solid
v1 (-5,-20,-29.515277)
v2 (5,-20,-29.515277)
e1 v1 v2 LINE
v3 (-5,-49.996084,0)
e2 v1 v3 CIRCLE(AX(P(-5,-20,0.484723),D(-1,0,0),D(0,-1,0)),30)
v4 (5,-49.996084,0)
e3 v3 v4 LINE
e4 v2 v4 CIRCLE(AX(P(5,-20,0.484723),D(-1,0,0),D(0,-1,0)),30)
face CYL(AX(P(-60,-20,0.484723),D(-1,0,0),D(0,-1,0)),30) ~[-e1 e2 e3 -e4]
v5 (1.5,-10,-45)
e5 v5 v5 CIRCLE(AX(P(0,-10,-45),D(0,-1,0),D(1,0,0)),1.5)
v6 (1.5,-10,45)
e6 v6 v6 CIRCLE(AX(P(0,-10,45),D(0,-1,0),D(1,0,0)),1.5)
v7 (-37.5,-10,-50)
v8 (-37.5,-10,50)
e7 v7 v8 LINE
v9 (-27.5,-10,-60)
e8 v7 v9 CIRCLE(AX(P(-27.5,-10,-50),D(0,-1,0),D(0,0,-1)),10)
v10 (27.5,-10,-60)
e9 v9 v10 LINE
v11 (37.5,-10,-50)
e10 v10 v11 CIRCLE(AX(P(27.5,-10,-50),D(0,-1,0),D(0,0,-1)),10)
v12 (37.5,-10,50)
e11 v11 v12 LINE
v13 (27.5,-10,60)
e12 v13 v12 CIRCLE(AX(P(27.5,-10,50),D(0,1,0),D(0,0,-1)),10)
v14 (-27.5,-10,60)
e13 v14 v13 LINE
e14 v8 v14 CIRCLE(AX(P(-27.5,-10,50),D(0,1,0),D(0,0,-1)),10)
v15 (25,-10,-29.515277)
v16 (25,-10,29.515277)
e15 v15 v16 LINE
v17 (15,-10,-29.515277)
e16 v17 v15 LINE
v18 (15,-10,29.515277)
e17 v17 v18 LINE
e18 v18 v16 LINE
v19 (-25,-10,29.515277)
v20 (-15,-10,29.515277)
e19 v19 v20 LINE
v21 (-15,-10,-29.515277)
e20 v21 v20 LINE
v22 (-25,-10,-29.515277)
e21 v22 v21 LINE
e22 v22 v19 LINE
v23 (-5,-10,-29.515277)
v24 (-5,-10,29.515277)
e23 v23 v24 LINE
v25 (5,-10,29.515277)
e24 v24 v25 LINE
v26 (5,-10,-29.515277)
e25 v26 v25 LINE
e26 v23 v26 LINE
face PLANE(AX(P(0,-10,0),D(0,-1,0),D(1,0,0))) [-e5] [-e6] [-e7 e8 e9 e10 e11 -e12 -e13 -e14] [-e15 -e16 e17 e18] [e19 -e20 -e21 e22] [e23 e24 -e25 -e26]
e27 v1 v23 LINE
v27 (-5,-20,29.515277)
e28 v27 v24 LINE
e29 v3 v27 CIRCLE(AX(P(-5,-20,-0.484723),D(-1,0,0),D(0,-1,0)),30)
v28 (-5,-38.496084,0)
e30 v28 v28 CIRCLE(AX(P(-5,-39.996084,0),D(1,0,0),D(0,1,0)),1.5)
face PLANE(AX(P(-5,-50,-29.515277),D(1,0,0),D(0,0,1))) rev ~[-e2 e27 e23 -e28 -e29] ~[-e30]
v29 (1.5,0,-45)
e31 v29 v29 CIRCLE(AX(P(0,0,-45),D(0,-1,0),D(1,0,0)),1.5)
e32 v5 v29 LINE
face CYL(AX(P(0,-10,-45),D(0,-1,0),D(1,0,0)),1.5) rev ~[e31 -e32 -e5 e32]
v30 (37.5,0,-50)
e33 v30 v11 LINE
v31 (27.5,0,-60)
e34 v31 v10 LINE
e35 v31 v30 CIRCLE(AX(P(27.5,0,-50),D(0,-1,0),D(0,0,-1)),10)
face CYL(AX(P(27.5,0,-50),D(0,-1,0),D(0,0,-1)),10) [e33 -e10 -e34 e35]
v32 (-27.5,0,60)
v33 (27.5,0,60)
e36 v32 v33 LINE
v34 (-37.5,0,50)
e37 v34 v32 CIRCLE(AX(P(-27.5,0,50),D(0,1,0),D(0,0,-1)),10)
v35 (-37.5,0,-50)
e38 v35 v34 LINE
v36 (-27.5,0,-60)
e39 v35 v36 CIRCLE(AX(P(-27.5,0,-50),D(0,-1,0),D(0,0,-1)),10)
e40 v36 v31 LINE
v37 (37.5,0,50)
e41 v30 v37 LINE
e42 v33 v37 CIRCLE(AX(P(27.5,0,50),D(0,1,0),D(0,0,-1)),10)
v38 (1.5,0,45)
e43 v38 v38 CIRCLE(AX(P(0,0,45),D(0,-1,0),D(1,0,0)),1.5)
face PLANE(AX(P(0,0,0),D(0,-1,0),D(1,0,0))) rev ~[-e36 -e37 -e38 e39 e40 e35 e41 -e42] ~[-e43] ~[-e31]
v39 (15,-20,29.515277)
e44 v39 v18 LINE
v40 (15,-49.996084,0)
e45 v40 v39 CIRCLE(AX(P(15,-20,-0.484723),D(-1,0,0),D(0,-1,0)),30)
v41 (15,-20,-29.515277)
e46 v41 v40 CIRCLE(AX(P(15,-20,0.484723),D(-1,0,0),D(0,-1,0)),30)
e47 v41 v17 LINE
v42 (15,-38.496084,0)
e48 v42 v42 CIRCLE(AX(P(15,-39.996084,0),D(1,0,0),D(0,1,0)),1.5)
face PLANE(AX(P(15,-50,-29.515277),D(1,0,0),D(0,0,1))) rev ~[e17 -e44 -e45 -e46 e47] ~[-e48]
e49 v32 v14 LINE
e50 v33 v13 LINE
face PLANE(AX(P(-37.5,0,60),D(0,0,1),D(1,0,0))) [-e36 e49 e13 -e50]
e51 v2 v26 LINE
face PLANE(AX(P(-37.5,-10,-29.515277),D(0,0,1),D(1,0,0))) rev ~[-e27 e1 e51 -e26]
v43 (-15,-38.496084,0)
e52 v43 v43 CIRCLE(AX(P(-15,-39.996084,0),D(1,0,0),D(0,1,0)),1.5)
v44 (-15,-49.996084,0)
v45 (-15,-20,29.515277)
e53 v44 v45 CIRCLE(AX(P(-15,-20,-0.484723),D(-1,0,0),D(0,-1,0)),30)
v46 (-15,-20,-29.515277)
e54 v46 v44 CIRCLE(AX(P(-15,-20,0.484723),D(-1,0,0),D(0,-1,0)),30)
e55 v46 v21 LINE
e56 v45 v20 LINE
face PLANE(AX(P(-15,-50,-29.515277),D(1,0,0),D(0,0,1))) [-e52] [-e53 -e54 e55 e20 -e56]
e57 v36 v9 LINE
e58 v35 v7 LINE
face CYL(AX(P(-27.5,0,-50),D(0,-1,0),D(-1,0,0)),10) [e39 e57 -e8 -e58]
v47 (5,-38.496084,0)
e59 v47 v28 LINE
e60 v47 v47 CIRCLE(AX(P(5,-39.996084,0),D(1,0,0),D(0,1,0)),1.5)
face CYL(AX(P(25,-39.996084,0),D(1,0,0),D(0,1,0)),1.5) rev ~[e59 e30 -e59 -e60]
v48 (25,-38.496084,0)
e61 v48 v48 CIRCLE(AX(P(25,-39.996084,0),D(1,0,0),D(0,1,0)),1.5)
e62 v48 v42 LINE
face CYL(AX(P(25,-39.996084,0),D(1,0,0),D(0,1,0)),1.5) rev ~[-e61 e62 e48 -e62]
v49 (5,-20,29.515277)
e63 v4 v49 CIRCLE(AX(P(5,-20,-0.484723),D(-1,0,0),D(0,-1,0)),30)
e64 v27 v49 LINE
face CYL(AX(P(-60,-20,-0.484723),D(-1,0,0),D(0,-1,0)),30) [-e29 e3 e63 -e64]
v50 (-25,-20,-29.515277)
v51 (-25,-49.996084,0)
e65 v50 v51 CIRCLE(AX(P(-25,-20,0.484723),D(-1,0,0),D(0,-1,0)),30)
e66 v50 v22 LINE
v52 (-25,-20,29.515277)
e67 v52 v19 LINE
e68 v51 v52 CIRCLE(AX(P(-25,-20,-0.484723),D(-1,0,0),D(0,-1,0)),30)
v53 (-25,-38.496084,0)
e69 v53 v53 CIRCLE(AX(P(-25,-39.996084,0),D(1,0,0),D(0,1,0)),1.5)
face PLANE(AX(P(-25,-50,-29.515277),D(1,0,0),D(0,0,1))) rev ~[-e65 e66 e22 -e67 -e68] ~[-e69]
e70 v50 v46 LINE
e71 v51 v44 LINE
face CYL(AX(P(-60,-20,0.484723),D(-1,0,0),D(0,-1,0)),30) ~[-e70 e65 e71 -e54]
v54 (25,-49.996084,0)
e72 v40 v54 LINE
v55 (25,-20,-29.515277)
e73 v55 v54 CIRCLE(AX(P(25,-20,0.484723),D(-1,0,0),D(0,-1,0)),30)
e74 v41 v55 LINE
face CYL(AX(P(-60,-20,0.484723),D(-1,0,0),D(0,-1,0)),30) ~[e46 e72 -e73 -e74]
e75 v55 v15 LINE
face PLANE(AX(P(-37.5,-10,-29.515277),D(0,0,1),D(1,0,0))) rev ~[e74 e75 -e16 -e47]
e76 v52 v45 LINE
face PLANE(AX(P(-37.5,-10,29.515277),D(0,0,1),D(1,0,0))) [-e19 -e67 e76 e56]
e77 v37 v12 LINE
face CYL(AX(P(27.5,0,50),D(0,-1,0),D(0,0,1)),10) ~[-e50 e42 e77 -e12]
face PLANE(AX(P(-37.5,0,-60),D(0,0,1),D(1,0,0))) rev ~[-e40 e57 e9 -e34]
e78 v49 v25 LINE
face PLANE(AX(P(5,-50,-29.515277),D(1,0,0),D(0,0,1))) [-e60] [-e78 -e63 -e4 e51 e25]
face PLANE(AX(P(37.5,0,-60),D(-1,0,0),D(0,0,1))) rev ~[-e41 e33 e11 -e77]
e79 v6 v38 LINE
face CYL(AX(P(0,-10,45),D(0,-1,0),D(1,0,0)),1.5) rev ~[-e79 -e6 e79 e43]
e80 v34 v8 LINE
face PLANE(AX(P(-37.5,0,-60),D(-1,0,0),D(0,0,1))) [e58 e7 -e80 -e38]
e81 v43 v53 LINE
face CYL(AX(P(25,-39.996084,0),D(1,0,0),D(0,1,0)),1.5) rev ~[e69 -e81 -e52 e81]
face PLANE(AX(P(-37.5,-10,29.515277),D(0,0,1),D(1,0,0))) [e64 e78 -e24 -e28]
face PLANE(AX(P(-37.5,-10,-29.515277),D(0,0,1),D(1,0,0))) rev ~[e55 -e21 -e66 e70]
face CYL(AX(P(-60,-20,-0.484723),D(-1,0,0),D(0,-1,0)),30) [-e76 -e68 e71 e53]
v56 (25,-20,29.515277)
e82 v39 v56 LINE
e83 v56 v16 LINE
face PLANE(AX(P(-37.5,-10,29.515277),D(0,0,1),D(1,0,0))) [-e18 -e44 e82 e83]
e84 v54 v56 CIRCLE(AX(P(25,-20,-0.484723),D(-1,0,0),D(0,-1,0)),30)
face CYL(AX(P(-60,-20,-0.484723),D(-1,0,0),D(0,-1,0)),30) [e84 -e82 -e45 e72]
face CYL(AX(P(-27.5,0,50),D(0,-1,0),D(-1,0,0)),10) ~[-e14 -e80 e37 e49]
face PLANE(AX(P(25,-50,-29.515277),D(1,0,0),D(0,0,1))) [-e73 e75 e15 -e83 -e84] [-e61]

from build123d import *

# Parameters (mm, degrees)
F0_W        = 75
F0_H        = 120
F1_DEPTH    = 10
F2_R        = 1.5
F3_DEPTH    = 41.3
F4_W        = 75
F4_H        = 59.0305535599
F5_DEPTH    = 40
F7_R        = 10
F6_W        = 12.5
F6_H        = 59.0305535599
F6_W_2      = 10
F8_DEPTH    = 40
F9_T1_DEPTH = 160
F9_T3_DEPTH = 160
F9_T5_DEPTH = 160
F10_R       = 1.5
F11_DEPTH   = 57.1


# Not quite as in the source:
# - a fillet or chamfer that OpenCascade refuses, or shapes differently, is made with other operations: its cross-section is extruded or revolved along the edge and cut away or added


with BuildPart() as f1:
    # F0 (on Front) → F1 (new body)
    with BuildSketch(Plane.XZ):
        Rectangle(F0_W, F0_H)
    extrude(amount=F1_DEPTH)

    # F2 (on face) → F3 (cut)
    with BuildSketch(Plane.XZ.offset(10)):
        with Locations((0, -45)):
            Circle(F2_R)
        with Locations((0, 45)):
            Circle(F2_R)
    extrude(amount=-F3_DEPTH, mode=Mode.SUBTRACT)

    # F4 (on face) → F5 (join)
    with BuildSketch(Plane.XZ.offset(10)):
        Rectangle(F4_W, F4_H)
    extrude(amount=F5_DEPTH)

    # F7
    f7_edges = [f1.edges().sort_by_distance(p)[0] for p in [
        (37.5, -5, 60),
        (-37.5, -5, 60),
        (-37.5, -5, -60),
        (37.5, -5, -60),
    ]]
    fillet(f7_edges, radius=F7_R)

    # F6 (on face) → F8 (cut)
    with BuildSketch(Plane.XZ.offset(50)):
        with Locations((-31.25, 0)):
            Rectangle(F6_W, F6_H)
        with Locations((-10, 0)):
            Rectangle(F6_W_2, F6_H)
        with Locations((10, 0)):
            Rectangle(F6_W_2, F6_H)
        with Locations((31.25, 0)):
            Rectangle(F6_W, F6_H)
    extrude(amount=-F8_DEPTH, mode=Mode.SUBTRACT)

    # F9: fillet of radius 30 on 6 edges, made by hand

    # F9_s2 → F9_t1 (cut)
    with BuildSketch(Plane.YZ.offset(-60)):
        with BuildLine():
            ThreePointArc((-50, -0.4847232201), (-41.2132034356, 20.7284802155), (-20, 29.5152767799))
            Line((-20, 29.5152767799), (-50, 29.5152767799))
            Line((-50, 29.5152767799), (-50, -0.4847232201))
        make_face()
        with BuildLine():
            ThreePointArc((-50, 0.4847232201), (-41.2132034356, -20.7284802155), (-20, -29.5152767799))
            Line((-20, -29.5152767799), (-50, -29.5152767799))
            Line((-50, -29.5152767799), (-50, 0.4847232201))
        make_face()
    extrude(amount=F9_T1_DEPTH, mode=Mode.SUBTRACT)

    # F9_s4 → F9_t3 (cut)
    with BuildSketch(Plane.YZ.offset(-80)):
        with BuildLine():
            ThreePointArc((-50, -0.4847232201), (-41.2132034356, 20.7284802155), (-20, 29.5152767799))
            Line((-20, 29.5152767799), (-50, 29.5152767799))
            Line((-50, 29.5152767799), (-50, -0.4847232201))
        make_face()
        with BuildLine():
            ThreePointArc((-50, 0.4847232201), (-41.2132034356, -20.7284802155), (-20, -29.5152767799))
            Line((-20, -29.5152767799), (-50, -29.5152767799))
            Line((-50, -29.5152767799), (-50, 0.4847232201))
        make_face()
    extrude(amount=F9_T3_DEPTH, mode=Mode.SUBTRACT)

    # F9_s6 → F9_t5 (cut)
    with BuildSketch(Plane.YZ.offset(-100)):
        with BuildLine():
            ThreePointArc((-50, -0.4847232201), (-41.2132034356, 20.7284802155), (-20, 29.5152767799))
            Line((-20, 29.5152767799), (-50, 29.5152767799))
            Line((-50, 29.5152767799), (-50, -0.4847232201))
        make_face()
        with BuildLine():
            ThreePointArc((-50, 0.4847232201), (-41.2132034356, -20.7284802155), (-20, -29.5152767799))
            Line((-20, -29.5152767799), (-50, -29.5152767799))
            Line((-50, -29.5152767799), (-50, 0.4847232201))
        make_face()
    extrude(amount=F9_T5_DEPTH, mode=Mode.SUBTRACT)

    # F10 (on face) → F11 (cut)
    with BuildSketch(Plane.YZ.offset(25)):
        with Locations((-39.9960838011, 0)):
            Circle(F10_R)
    extrude(amount=-F11_DEPTH, mode=Mode.SUBTRACT)


solid = f1.part
